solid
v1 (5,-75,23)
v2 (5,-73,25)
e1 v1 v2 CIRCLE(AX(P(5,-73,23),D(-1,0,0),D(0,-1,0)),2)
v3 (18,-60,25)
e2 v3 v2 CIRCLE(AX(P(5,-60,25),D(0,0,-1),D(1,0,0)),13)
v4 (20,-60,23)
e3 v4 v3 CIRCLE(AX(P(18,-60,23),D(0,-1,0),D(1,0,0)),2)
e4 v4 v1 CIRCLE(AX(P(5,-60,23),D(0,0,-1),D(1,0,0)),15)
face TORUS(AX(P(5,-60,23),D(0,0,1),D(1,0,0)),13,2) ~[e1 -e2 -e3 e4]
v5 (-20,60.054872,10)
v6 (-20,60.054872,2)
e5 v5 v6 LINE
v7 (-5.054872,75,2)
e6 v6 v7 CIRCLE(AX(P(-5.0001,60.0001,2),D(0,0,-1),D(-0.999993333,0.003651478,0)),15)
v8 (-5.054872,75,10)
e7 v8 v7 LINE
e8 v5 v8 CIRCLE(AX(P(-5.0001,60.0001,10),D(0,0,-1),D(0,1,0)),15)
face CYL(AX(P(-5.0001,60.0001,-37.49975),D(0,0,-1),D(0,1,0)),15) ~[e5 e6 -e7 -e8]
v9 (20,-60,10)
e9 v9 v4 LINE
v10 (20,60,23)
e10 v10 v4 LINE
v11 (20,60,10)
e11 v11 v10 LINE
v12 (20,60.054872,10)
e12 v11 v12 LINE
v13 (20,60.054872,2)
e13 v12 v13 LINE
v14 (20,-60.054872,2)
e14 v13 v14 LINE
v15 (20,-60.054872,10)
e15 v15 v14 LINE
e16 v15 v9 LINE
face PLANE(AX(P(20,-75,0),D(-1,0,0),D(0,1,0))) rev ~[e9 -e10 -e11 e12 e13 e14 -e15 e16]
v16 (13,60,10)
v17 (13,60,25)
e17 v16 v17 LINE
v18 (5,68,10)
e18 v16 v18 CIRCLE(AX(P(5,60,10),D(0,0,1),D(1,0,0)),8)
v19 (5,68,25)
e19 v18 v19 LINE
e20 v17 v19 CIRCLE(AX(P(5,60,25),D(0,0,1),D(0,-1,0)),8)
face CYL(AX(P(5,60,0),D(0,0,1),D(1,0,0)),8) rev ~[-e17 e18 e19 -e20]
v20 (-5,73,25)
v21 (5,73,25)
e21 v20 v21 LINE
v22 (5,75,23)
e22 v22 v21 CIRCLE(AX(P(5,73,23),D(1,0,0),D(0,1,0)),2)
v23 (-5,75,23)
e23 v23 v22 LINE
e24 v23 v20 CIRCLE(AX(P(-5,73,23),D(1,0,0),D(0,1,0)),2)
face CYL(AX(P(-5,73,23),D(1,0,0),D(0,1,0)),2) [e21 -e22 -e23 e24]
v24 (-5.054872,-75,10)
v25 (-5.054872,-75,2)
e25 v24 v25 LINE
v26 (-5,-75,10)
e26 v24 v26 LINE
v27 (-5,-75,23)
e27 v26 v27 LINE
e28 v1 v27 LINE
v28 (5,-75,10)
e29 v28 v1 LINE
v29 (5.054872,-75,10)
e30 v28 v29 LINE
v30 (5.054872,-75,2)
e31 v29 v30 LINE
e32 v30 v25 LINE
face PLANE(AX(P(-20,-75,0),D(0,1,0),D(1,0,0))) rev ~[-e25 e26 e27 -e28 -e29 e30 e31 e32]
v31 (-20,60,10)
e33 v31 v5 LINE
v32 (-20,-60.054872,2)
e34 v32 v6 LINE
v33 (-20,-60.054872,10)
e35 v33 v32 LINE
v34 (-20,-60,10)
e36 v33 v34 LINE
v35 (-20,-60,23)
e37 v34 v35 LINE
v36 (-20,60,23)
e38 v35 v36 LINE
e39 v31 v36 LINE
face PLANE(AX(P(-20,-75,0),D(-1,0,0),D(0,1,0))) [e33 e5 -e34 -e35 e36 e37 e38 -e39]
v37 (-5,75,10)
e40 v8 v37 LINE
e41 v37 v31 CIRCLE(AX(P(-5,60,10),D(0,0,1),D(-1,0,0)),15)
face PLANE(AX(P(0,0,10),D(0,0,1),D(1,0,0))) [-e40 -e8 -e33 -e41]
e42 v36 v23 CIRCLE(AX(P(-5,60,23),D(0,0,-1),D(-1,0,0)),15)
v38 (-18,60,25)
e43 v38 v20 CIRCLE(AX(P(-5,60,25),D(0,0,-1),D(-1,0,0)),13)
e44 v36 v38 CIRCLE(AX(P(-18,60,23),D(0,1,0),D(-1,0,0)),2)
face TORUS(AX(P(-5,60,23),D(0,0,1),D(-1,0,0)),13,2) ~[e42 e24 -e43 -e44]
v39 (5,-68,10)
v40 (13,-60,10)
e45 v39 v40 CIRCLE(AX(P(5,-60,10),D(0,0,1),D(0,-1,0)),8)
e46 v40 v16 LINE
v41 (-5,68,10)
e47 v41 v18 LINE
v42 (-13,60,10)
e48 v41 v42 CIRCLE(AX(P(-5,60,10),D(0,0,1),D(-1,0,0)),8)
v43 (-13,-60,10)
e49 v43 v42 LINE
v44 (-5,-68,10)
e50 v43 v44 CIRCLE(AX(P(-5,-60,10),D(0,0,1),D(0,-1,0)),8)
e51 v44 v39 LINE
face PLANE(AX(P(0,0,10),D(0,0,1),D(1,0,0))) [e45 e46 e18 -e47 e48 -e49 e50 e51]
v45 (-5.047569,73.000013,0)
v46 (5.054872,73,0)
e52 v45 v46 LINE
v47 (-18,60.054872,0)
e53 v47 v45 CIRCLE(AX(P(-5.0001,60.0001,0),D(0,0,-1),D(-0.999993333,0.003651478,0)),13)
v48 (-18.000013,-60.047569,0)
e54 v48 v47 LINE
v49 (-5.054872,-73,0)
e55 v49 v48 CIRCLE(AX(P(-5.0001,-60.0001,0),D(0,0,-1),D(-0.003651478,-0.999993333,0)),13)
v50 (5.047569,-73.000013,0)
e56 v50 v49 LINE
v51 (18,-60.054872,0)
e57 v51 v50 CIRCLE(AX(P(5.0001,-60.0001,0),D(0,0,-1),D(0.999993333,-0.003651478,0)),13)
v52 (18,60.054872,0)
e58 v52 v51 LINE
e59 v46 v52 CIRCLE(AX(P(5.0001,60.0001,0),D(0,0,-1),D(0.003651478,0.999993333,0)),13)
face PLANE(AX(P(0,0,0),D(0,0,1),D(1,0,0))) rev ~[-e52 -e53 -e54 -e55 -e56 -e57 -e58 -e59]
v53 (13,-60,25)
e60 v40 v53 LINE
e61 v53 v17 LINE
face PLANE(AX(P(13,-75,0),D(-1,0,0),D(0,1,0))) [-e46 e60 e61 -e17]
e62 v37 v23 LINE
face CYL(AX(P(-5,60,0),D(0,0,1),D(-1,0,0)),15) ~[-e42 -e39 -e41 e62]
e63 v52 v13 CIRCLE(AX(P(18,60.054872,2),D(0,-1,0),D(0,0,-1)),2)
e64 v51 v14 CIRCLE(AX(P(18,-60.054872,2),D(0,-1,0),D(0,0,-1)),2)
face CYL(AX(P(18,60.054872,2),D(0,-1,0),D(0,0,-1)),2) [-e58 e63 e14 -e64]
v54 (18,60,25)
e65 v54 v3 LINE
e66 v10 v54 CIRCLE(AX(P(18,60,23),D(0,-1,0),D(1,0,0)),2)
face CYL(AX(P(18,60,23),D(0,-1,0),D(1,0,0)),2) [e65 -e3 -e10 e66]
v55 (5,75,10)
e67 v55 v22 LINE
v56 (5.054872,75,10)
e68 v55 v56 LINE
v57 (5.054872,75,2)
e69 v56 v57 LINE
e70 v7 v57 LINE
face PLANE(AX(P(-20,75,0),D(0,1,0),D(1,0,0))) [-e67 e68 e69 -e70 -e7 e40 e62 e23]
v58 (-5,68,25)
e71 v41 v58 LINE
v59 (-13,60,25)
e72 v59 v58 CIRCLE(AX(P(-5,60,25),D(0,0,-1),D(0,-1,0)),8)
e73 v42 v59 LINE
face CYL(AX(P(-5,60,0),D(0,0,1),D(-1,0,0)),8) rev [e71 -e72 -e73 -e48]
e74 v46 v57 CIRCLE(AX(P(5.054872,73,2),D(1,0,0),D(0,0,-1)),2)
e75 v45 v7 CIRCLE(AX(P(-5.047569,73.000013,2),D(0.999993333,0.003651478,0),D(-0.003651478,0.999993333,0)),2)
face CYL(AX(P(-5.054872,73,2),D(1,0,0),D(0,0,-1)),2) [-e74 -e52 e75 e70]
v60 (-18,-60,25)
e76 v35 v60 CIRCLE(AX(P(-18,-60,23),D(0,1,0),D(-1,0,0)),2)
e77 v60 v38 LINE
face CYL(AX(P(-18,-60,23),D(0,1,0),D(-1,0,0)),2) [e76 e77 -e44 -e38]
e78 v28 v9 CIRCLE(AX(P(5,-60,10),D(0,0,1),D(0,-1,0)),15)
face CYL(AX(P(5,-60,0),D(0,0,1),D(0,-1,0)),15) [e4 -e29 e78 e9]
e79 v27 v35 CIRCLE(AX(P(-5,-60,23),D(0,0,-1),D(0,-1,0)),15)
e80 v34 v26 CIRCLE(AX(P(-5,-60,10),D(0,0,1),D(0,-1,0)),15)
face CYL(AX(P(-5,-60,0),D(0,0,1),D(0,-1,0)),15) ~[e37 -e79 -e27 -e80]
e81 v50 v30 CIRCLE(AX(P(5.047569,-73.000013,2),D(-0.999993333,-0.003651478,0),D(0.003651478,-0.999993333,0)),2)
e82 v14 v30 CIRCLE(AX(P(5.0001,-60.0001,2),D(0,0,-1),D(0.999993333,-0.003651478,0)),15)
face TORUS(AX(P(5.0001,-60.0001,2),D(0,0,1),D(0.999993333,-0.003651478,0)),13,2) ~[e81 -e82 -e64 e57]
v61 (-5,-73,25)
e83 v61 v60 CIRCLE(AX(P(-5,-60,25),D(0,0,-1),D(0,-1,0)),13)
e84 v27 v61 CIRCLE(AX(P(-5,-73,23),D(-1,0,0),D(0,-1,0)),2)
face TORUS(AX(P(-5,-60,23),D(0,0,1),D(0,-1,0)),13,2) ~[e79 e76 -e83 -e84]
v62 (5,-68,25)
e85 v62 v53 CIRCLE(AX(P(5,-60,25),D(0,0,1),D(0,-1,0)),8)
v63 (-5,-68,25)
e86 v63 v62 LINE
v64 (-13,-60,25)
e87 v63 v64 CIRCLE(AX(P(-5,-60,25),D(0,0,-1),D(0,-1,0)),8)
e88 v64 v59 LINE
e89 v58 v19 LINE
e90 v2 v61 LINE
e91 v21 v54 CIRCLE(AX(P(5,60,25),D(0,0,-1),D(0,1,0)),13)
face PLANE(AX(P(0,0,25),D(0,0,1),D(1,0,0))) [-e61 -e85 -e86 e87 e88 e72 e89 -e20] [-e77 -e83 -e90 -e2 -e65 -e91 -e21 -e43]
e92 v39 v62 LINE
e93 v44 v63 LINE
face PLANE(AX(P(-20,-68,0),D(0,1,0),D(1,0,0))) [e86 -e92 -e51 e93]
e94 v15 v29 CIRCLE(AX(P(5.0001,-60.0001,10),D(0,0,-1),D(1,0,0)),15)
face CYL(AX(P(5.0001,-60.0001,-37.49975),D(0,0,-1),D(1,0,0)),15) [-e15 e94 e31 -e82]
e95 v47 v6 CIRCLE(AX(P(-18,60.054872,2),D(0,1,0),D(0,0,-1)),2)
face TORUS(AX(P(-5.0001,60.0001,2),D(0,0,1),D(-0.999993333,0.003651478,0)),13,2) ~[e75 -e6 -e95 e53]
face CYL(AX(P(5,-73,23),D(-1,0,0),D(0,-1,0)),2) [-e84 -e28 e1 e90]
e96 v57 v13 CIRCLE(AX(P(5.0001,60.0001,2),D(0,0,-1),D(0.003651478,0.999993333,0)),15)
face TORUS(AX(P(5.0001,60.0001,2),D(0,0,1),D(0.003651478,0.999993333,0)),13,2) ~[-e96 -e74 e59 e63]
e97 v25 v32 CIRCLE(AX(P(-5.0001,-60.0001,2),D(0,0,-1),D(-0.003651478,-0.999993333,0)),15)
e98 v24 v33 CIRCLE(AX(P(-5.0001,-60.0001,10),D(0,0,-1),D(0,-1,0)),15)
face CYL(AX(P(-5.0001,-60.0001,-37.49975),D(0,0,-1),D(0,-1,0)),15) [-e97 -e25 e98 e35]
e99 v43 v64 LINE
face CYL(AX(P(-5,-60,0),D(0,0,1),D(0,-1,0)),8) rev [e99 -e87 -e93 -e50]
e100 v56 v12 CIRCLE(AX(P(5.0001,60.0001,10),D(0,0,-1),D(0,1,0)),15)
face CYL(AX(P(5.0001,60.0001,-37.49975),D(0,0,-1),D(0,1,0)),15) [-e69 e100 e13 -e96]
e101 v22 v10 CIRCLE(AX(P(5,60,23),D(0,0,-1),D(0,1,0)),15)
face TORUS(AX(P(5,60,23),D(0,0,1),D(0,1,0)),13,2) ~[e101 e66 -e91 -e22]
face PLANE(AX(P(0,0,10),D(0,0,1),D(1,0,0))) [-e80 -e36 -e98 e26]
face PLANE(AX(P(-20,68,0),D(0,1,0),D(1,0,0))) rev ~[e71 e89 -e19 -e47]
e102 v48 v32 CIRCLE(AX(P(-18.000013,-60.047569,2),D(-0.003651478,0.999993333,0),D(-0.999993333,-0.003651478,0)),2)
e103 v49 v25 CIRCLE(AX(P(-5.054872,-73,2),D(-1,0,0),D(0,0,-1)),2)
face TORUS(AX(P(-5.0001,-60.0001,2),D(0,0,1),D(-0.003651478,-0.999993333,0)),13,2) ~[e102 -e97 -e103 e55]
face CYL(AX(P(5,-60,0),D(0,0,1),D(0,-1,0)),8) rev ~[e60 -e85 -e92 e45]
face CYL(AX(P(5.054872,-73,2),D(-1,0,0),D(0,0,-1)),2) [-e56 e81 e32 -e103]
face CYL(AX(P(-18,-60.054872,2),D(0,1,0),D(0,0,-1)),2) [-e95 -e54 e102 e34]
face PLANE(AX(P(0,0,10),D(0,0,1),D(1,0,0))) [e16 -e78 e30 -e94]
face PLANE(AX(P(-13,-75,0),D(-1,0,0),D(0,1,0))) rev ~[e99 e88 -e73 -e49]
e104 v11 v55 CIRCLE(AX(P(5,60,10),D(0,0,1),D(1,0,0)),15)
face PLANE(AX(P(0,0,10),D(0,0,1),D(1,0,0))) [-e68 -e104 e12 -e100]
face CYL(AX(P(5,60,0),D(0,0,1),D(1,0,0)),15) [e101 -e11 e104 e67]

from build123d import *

# Parameters (mm, degrees)
F0_W         = 40
F0_H         = 150
F11_DEPTH    = 25
F1_R         = 15
F2_R         = 15
F3_R         = 15
F5_T         = -7
F6_DEPTH     = 10
F12_T1_DEPTH = 84.9995000017
F7_R         = 2


# Not quite as in the source:
# - a fillet or chamfer that OpenCascade refuses, or shapes differently, is made with other operations: its cross-section is extruded or revolved along the edge and cut away or added
# - a feature of the source that left no trace in its solid (it failed there, or was rolled back) is left out


with BuildPart() as f11:
    # F0 (on Top) → F11 (new body)
    with BuildSketch(Plane.XY):
        Rectangle(F0_W, F0_H)
    extrude(amount=F11_DEPTH)

    # F1
    f1_edges = [f11.edges().sort_by_distance(p)[0] for p in [
        (20, -75, 12.5),
    ]]
    fillet(f1_edges, radius=F1_R)

    # F2
    f2_edges = [f11.edges().sort_by_distance(p)[0] for p in [
        (-20, -75, 12.5),
    ]]
    fillet(f2_edges, radius=F2_R)

    # F3
    f3_edges = [f11.edges().sort_by_distance(p)[0] for p in [
        (-20, 75, 12.5),
        (20, 75, 12.5),
    ]]
    fillet(f3_edges, radius=F3_R)

    # F5
    f5_openings = [f11.faces().sort_by_distance(p)[0] for p in [
        (0, 0, 25),
    ]]
    offset(amount=F5_T, openings=f5_openings)

    # F0 (on Top) → F6 (join)
    with BuildSketch(Plane.XY):
        Rectangle(F0_W, F0_H)
    extrude(amount=F6_DEPTH)

    # F12: fillet of radius 15 on 4 edges, made by hand

    # F12_s2 → F12_t1 (cut)
    with BuildSketch(Plane.XY.offset(-37.4997500008)):
        with BuildLine():
            ThreePointArc((20.0001, -60.0001), (15.6067017178, -70.6067017178), (5.0001, -75.0001))
            Line((5.0001, -75.0001), (5.0001, -75.3001))
            ThreePointArc((5.0001, -75.3001), (12.50005, -75.3), (20, -75.3))
            Line((20, -75.3), (20.3, -75))
            ThreePointArc((20.3, -75), (20.3, -67.50005), (20.3001, -60.0001))
            Line((20.3001, -60.0001), (20.0001, -60.0001))
        make_face()
        with BuildLine():
            ThreePointArc((-5.0001, -75.0001), (-15.6067017178, -70.6067017178), (-20.0001, -60.0001))
            Line((-20.0001, -60.0001), (-20.3001, -60.0001))
            ThreePointArc((-20.3001, -60.0001), (-20.3, -67.50005), (-20.3, -75))
            Line((-20.3, -75), (-20, -75.3))
            ThreePointArc((-20, -75.3), (-12.50005, -75.3), (-5.0001, -75.3001))
            Line((-5.0001, -75.3001), (-5.0001, -75.0001))
        make_face()
        with BuildLine():
            ThreePointArc((5.0001, 75.0001), (15.6067017178, 70.6067017178), (20.0001, 60.0001))
            Line((20.0001, 60.0001), (20.3001, 60.0001))
            ThreePointArc((20.3001, 60.0001), (20.3, 67.50005), (20.3, 75))
            Line((20.3, 75), (20, 75.3))
            ThreePointArc((20, 75.3), (12.50005, 75.3), (5.0001, 75.3001))
            Line((5.0001, 75.3001), (5.0001, 75.0001))
        make_face()
        with BuildLine():
            ThreePointArc((-5.0001, 75.0001), (-15.6067017178, 70.6067017178), (-20.0001, 60.0001))
            Line((-20.0001, 60.0001), (-20.3001, 60.0001))
            ThreePointArc((-20.3001, 60.0001), (-20.3, 67.50005), (-20.3, 75))
            Line((-20.3, 75), (-20, 75.3))
            ThreePointArc((-20, 75.3), (-12.50005, 75.3), (-5.0001, 75.3001))
            Line((-5.0001, 75.3001), (-5.0001, 75.0001))
        make_face()
    extrude(amount=F12_T1_DEPTH, mode=Mode.SUBTRACT)

    # F7
    f7_edges = [f11.edges().sort_by_distance(p)[0] for p in [
        (20, 0, 0),
        (-20, 0, 0),
        (-15.606702, 70.606702, 0),
        (0, 75, 0),
        (15.606702, 70.606702, 0),
        (15.606702, -70.606702, 0),
        (0, -75, 0),
        (-15.606702, -70.606702, 0),
        (-20, 0, 25),
        (0, 75, 25),
        (20, 0, 25),
        (0, -75, 25),
        (-15.606602, -70.606602, 25),
        (15.606602, -70.606602, 25),
        (15.606602, 70.606602, 25),
        (-15.606602, 70.606602, 25),
    ]]
    fillet(f7_edges, radius=F7_R)


solid = f11.part
